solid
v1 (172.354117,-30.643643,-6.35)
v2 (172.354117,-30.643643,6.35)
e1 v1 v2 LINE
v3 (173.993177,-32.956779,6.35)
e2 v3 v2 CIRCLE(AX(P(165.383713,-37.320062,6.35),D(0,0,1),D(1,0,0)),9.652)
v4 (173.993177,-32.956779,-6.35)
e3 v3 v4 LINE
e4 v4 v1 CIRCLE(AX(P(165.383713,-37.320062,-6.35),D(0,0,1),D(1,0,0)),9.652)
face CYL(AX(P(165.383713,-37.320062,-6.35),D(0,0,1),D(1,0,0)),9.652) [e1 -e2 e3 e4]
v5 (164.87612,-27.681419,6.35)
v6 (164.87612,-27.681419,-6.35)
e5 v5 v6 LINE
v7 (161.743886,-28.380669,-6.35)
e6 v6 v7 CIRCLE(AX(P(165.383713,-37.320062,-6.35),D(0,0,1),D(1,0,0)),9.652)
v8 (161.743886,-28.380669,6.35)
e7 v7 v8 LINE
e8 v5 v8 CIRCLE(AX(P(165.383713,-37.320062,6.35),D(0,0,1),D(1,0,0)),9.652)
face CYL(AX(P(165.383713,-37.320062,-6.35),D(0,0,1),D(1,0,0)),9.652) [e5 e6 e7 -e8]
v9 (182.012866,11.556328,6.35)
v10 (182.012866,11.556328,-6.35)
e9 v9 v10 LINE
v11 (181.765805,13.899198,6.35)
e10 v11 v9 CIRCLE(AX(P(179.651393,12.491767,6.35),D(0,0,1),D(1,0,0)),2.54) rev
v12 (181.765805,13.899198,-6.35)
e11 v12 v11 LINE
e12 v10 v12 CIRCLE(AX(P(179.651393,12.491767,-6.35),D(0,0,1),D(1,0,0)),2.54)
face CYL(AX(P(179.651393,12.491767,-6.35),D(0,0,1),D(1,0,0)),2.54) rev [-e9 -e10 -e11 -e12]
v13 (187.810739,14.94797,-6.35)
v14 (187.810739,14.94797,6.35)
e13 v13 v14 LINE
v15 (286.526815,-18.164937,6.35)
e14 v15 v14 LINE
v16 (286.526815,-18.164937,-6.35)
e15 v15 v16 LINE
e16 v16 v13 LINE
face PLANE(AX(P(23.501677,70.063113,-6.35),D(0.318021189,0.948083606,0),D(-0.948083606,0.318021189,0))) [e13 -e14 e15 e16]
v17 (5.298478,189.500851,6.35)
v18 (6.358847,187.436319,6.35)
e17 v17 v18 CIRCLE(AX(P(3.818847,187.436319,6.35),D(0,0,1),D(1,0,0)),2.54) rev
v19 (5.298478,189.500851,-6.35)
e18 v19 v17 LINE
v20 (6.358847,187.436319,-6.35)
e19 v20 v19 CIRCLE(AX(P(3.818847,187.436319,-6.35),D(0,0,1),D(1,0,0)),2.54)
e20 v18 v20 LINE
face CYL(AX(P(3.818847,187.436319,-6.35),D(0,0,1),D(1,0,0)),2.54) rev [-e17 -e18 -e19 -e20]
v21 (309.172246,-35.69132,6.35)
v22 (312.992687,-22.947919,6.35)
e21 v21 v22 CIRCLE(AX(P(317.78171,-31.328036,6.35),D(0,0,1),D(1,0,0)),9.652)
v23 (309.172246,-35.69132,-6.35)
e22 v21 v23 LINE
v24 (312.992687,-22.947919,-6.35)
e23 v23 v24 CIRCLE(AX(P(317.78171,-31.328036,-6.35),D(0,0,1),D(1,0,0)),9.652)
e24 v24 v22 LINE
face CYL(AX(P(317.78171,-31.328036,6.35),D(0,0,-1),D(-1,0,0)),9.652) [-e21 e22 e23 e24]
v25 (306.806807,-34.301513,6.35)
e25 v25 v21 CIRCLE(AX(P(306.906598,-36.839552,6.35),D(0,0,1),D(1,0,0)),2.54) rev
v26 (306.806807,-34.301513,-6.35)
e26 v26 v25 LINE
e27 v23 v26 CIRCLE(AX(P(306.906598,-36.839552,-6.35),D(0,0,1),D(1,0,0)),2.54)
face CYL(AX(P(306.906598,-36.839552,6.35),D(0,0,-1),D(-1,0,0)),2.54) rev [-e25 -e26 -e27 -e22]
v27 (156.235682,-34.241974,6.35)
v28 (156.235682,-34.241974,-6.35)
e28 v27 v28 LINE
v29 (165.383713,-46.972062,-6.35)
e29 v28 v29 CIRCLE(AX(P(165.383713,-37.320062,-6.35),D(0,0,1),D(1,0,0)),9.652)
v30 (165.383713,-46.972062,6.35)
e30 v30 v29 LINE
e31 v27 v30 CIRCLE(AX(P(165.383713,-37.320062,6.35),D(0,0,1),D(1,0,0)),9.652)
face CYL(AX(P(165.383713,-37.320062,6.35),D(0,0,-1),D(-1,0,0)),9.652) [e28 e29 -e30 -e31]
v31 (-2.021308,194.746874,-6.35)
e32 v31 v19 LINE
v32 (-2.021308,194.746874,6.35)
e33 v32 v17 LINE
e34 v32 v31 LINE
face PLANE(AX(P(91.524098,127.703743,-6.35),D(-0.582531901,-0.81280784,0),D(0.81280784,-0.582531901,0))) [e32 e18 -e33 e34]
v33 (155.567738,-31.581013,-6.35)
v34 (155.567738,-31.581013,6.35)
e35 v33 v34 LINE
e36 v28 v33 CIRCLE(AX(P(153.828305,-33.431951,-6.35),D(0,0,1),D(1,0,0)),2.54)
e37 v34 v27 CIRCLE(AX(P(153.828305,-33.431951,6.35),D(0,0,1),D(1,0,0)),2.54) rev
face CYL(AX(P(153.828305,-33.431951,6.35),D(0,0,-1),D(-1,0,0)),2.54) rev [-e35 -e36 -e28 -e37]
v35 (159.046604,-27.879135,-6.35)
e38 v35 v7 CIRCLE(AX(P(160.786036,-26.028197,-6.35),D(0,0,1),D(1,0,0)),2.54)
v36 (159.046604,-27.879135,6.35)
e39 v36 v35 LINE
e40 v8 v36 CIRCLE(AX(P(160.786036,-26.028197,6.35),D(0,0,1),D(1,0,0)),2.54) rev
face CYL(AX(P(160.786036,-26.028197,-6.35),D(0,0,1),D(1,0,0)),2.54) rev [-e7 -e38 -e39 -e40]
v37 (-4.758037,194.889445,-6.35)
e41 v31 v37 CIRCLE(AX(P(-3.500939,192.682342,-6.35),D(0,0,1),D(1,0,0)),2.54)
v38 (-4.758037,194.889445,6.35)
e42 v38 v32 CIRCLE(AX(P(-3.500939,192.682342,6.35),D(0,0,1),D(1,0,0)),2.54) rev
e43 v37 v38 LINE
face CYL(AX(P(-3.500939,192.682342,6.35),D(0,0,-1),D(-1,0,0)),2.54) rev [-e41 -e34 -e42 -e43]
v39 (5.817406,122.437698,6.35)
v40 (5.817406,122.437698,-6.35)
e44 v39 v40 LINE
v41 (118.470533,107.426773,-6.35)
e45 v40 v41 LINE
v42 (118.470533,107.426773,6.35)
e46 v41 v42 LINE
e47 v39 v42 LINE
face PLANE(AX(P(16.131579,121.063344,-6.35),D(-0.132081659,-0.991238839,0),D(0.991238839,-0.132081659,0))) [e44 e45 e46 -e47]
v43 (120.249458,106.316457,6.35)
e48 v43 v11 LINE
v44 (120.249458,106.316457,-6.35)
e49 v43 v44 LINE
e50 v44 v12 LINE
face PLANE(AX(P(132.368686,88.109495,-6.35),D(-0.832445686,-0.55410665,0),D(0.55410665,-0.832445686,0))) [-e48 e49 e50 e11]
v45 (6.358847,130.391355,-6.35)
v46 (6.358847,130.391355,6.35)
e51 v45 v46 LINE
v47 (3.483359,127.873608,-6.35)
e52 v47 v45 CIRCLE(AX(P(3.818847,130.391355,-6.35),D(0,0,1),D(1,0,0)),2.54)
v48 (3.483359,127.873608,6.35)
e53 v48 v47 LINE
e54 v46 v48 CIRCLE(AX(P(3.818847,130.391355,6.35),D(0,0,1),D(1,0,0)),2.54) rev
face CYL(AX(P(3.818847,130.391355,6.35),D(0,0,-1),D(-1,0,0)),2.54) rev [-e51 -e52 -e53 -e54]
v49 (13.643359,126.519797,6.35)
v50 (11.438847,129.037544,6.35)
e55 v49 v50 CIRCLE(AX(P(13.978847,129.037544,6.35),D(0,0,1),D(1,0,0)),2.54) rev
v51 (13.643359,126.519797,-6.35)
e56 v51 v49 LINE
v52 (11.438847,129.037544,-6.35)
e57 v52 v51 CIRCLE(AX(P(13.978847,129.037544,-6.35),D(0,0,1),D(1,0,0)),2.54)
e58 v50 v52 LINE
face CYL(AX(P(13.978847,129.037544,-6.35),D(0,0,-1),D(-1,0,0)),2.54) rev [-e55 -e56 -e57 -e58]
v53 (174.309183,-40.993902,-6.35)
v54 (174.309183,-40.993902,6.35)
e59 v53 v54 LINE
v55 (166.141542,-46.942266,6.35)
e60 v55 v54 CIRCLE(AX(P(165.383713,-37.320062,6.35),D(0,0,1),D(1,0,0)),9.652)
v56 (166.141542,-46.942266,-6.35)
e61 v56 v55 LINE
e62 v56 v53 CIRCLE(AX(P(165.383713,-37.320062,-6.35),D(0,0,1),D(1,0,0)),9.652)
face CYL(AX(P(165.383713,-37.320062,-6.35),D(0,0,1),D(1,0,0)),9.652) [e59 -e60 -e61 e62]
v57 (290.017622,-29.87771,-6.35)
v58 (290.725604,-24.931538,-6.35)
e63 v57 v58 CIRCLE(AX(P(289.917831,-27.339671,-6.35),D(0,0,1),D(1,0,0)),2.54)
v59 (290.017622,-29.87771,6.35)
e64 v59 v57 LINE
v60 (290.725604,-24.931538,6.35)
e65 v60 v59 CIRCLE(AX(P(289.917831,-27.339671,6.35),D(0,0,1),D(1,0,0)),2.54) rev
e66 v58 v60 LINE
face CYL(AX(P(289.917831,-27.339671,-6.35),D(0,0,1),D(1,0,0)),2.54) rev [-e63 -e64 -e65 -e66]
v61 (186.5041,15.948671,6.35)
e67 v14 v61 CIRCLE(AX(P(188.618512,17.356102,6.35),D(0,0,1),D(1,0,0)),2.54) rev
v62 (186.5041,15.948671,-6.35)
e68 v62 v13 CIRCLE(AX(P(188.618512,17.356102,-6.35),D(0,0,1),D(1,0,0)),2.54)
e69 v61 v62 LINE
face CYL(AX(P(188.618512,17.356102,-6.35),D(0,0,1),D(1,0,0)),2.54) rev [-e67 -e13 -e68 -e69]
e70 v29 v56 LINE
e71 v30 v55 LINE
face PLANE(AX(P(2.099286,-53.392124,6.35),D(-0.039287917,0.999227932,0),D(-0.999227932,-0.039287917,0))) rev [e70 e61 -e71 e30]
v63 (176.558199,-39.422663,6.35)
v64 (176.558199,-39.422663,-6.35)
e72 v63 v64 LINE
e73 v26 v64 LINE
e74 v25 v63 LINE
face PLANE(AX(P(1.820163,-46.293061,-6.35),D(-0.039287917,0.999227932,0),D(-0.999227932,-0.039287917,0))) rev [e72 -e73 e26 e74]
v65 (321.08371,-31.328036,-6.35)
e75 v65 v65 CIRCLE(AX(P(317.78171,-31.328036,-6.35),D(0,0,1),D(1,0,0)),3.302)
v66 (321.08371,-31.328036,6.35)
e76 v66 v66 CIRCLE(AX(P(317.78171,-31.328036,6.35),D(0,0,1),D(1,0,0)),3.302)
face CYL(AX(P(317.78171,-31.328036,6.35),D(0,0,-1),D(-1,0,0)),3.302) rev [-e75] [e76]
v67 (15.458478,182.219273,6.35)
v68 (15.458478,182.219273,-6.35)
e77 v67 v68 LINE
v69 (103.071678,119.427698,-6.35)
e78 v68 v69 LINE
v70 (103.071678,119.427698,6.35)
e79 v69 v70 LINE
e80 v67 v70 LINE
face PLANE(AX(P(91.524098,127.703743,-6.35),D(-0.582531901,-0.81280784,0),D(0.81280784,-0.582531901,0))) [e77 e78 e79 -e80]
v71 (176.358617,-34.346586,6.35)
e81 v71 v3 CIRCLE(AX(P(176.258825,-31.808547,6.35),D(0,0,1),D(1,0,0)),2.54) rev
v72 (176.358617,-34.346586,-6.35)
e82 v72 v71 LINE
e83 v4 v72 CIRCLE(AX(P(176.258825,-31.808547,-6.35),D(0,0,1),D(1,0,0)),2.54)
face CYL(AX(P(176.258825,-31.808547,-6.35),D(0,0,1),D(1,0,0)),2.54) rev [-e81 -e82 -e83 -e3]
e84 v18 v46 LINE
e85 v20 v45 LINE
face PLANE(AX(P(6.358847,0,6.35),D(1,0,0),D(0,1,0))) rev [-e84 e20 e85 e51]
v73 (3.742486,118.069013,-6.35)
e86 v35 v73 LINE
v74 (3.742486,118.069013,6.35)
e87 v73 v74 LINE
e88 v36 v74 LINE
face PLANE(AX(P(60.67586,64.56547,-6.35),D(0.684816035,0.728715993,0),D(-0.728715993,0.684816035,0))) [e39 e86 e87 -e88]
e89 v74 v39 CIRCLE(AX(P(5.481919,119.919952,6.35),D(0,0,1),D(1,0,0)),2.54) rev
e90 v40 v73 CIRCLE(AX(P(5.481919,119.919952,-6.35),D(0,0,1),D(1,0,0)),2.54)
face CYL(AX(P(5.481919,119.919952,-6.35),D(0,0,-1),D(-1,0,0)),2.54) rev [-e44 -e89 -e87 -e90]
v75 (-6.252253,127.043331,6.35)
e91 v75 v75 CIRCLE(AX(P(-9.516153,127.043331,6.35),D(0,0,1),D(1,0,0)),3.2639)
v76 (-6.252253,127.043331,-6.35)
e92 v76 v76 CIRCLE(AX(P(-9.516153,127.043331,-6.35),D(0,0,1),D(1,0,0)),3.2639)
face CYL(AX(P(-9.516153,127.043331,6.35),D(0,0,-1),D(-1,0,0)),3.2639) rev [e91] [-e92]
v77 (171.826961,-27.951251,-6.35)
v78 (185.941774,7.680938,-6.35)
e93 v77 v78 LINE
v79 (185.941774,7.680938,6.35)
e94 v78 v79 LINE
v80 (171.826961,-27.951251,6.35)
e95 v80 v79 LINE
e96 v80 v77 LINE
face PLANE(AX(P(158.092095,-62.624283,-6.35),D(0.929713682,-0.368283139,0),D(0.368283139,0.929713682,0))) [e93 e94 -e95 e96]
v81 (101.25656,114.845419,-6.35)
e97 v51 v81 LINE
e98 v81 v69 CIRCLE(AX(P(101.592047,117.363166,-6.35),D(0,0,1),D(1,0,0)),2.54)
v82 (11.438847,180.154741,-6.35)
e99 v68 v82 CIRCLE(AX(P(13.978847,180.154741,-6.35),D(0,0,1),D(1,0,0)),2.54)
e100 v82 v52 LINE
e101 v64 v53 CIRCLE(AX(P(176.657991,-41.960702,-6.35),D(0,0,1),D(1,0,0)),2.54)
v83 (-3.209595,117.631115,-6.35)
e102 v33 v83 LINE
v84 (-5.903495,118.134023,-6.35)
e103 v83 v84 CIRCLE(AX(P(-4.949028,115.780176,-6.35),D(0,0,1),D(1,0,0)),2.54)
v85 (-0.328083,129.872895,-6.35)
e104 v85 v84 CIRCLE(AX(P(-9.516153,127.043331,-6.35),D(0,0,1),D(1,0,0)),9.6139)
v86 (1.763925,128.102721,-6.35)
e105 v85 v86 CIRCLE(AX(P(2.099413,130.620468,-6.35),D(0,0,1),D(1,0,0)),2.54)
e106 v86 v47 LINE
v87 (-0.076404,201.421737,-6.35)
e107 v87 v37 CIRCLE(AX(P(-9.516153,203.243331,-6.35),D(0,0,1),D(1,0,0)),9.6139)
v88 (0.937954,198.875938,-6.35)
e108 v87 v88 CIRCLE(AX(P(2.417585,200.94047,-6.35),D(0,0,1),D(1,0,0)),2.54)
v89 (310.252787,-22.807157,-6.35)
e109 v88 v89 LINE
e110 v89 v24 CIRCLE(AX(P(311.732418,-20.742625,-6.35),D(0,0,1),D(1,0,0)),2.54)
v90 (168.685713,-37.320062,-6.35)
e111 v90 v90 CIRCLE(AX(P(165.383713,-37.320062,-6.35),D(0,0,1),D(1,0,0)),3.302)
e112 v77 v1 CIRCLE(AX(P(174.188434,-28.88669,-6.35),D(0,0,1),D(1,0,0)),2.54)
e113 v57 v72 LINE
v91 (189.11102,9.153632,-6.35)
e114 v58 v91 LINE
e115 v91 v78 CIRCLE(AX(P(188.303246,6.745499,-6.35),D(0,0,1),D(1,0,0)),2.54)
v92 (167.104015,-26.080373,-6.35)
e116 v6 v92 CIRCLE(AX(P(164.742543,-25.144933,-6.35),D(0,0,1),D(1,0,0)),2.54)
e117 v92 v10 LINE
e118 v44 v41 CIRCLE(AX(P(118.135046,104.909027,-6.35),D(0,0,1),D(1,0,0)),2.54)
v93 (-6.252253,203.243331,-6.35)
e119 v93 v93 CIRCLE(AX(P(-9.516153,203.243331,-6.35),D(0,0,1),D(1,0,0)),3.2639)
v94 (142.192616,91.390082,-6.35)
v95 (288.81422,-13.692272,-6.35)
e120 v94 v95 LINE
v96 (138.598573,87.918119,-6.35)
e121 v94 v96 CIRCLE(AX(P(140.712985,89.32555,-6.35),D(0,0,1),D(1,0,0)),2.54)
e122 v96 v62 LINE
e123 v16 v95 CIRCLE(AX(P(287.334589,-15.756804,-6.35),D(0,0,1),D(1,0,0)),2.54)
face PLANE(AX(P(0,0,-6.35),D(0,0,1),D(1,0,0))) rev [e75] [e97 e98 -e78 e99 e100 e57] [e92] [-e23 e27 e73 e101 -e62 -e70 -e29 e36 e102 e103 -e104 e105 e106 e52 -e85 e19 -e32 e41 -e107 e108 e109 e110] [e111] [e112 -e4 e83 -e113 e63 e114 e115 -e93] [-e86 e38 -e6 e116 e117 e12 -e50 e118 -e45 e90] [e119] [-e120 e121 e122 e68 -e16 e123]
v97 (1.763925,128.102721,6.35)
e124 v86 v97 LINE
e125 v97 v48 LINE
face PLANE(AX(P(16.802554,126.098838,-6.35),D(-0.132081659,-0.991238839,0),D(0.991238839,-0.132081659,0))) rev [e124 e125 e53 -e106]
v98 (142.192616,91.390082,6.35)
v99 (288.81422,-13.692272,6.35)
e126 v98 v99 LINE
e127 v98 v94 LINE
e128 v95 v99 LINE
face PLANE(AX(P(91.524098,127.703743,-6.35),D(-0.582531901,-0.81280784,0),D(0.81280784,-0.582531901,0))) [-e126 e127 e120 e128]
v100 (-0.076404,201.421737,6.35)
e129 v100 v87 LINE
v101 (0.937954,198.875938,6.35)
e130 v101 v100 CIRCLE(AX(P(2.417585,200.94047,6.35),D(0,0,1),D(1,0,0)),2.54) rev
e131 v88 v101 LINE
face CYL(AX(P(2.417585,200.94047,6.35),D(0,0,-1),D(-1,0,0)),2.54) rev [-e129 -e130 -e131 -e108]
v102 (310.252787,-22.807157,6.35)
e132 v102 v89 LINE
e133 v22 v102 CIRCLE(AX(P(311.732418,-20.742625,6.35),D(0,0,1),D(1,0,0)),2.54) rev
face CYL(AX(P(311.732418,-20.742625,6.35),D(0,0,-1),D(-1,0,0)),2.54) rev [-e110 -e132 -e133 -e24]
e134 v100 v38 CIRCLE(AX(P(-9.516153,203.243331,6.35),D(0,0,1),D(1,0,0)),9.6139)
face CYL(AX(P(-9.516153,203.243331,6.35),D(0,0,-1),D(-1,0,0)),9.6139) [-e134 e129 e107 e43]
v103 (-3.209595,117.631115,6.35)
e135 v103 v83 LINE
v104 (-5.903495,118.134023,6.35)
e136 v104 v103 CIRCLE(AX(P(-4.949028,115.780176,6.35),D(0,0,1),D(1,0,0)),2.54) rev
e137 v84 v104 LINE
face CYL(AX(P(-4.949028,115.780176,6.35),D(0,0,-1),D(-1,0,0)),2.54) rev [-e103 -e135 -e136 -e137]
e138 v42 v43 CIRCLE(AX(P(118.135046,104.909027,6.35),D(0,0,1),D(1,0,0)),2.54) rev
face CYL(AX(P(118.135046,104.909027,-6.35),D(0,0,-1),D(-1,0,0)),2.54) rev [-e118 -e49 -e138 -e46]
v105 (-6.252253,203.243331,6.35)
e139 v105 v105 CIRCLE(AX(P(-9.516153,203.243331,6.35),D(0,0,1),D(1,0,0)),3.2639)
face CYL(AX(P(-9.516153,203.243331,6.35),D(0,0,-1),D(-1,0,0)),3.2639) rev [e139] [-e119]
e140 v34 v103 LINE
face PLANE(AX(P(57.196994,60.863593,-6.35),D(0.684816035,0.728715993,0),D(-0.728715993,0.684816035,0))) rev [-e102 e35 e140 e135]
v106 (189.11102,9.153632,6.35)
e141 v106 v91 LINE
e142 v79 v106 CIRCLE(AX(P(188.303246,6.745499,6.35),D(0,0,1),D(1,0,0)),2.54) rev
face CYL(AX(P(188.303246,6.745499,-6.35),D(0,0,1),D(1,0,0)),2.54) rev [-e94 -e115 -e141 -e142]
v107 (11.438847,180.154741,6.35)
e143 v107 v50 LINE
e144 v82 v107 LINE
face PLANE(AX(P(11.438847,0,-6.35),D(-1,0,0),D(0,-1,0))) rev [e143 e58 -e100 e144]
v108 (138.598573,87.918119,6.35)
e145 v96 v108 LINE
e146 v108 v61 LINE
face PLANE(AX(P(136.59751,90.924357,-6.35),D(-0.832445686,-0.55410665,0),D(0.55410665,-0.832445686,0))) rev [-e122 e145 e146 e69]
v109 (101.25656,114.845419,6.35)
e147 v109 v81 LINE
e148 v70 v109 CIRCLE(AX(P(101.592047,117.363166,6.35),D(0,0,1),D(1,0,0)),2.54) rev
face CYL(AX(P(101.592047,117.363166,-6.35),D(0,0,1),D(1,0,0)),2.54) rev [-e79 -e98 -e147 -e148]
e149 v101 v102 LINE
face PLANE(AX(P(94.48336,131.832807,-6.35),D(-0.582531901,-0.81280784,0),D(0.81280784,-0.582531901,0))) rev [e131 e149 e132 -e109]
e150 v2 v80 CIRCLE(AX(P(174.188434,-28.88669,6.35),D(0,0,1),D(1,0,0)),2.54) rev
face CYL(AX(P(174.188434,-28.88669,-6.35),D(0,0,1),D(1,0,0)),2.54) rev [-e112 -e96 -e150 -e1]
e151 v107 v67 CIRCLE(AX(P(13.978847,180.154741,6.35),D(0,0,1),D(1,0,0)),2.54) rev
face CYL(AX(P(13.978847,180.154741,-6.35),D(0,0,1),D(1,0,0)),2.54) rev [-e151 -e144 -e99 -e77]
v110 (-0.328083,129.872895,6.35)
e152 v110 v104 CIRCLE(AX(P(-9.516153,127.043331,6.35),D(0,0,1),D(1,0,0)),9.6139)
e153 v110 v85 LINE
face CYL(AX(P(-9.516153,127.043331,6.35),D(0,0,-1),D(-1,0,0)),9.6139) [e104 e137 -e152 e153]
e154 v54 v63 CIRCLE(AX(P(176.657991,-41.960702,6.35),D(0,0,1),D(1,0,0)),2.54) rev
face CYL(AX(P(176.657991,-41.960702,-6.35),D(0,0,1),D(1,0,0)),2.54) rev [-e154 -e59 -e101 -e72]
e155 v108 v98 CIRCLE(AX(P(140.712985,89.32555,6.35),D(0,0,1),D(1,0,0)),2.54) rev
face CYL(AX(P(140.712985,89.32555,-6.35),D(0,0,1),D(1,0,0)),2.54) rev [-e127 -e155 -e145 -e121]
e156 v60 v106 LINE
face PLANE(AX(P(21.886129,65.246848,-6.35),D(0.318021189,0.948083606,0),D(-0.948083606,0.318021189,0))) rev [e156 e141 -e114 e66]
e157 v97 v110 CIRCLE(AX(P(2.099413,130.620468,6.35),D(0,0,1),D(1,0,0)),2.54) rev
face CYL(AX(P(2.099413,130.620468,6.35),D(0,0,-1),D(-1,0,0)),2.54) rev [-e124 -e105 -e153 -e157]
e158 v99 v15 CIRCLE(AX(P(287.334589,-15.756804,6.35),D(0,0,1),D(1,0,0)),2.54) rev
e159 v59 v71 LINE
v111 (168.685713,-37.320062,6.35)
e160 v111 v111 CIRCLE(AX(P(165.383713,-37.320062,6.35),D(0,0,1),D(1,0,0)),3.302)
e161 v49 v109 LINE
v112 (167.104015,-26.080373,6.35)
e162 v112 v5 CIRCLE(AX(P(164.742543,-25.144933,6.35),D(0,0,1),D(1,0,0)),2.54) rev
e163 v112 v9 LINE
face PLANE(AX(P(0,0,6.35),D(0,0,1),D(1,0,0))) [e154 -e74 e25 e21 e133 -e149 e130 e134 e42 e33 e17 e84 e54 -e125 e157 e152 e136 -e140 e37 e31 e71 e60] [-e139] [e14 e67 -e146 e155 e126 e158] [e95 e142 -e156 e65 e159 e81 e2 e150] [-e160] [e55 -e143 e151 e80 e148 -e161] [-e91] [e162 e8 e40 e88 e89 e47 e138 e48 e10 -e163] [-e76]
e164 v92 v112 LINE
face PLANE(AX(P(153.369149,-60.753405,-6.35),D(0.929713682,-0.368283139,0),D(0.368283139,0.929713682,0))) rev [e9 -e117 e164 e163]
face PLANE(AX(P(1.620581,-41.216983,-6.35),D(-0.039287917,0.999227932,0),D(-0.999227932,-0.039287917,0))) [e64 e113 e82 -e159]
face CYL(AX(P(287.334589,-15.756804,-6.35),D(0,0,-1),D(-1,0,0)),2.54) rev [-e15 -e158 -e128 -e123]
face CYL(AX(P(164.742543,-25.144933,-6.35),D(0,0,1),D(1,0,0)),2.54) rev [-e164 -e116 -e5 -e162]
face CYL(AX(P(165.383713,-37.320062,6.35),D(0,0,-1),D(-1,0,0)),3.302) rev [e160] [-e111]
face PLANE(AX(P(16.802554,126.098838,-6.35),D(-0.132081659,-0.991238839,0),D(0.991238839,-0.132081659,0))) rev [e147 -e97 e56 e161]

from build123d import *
from build123d.topology import SkipClean

# Parameters (mm, degrees)
SKETCH1_R               = 3.2639
SKETCH1_R_2             = 3.302
BOSS_EXTRUDE1_DEPTH     = 6.35
FILLET1_R               = 6.35
CUT_EXTRUDE1_DEPTH      = 391.591036161
CUT_EXTRUDE1_DEPTH_BACK = 391.591036161
FILLET2_R               = 2.54
FILLET3_START           = -6.35
FILLET3_DEPTH           = 12.7


with BuildPart() as part:
    # Sketch1 → Boss-Extrude1 (new, symmetric)
    with BuildSketch(Plane.XY):
        with BuildLine():
            Line((323.403565347, -23.482283069), (-3.916489287, 211.058114043))
            ThreePointArc((-3.916489287, 211.058114043), (-17.330936491, 208.842994945), (-15.115817393, 195.42854774))
            Line((-15.115817393, 195.42854774), (6.35884666, 180.040928914))
            Line((6.35884666, 180.040928914), (6.35884666, 136.657230892))
            Line((6.35884666, 136.657230892), (-9.51615334, 136.657230892))
            ThreePointArc((-9.51615334, 136.657230892), (-18.453997349, 130.584802008), (-16.101018255, 120.038573419))
            Line((-16.101018255, 120.038573419), (158.772752683, -44.352579771))
            ThreePointArc((158.772752683, -44.352579771), (161.828207487, -46.293327152), (165.383713496, -46.97206236))
            Line((165.383713496, -46.97206236), (317.781709759, -40.9800363))
            ThreePointArc((317.781709759, -40.9800363), (326.971059958, -34.280483913), (323.403565347, -23.482283069))
        make_face()
        with Locations((-9.51615334, 203.243330892)):
            Circle(SKETCH1_R, mode=Mode.SUBTRACT)
        with Locations((317.781709759, -31.3280363)):
            Circle(SKETCH1_R_2, mode=Mode.SUBTRACT)
        with Locations((165.383713496, -37.32006236)):
            Circle(SKETCH1_R_2, mode=Mode.SUBTRACT)
        with Locations((-9.51615334, 127.043330892)):
            Circle(SKETCH1_R, mode=Mode.SUBTRACT)
    extrude(amount=BOSS_EXTRUDE1_DEPTH, both=True)

    # Fillet1
    fillet1_edges = [part.edges().sort_by_distance(p)[0] for p in [
        (6.35884666, 136.657230892, 0),
        (6.35884666, 180.040928914, 0),
    ]]
    fillet(fillet1_edges, radius=FILLET1_R)

    # Sketch3 → Cut-Extrude1 (cut, two sides: drawn at the far end of the back side and taken through both)
    with SkipClean():  # the faces are left unmerged after this step: merging them gives an invalid solid
        with BuildSketch(Plane.XY.offset(-CUT_EXTRUDE1_DEPTH_BACK)):
            with BuildLine():
                ThreePointArc((3.707435863, 181.940790938), (5.657233219, 179.680529676), (6.35884666, 176.779111181))
                Line((6.35884666, 176.779111181), (6.35884666, 188.740894591))
                Line((6.35884666, 188.740894591), (-3.45918948, 195.777390763))
                ThreePointArc((-3.45918948, 195.777390763), (-9.228570931, 193.633733108), (-15.115817393, 195.42854774))
                Line((-15.115817393, 195.42854774), (3.707435863, 181.940790938))
            make_face()
            with BuildLine():
                ThreePointArc((0.09774666, 203.243330892), (-0.052851391, 201.548341381), (-0.499927425, 199.90645459))
                Line((-0.499927425, 199.90645459), (122.05229066, 112.074407425))
                Line((122.05229066, 112.074407425), (122.945240738, 111.43443832))
                Line((122.945240738, 111.43443832), (311.692641772, -23.839087438))
                ThreePointArc((311.692641772, -23.839087438), (317.487772358, -21.680513052), (323.403565347, -23.482283069))
                Line((323.403565347, -23.482283069), (-3.916489287, 211.058114043))
                ThreePointArc((-3.916489287, 211.058114043), (-0.96449609, 207.636078493), (0.09774666, 203.243330892))
            make_face()
            Polygon((111.340098755, 113.501797091), (11.43884666, 185.10010533), (11.43884666, 126.813546556), align=None)
            with BuildLine():
                Line((119.611598008, 107.274727388), (-0.660580828, 123.300884005))
                ThreePointArc((-0.660580828, 123.300884005), (-0.831975536, 122.91875466), (-1.019850221, 122.544452529))
                Line((-1.019850221, 122.544452529), (160.337493151, -29.092258022))
                ThreePointArc((160.337493151, -29.092258022), (163.280736167, -27.8999461), (166.451617397, -27.727321081))
                Line((166.451617397, -27.727321081), (182.502514914, 12.79242434))
                Line((182.502514914, 12.79242434), (119.611598008, 107.274727388))
            make_face()
            with BuildLine():
                ThreePointArc((-4.498715678, 118.842575285), (-10.501957546, 117.480106369), (-16.101018255, 120.038573419))
                Line((-16.101018255, 120.038573419), (158.772752683, -44.352579771))
                ThreePointArc((158.772752683, -44.352579771), (155.861403554, -38.896995261), (156.858627693, -32.794135266))
                Line((156.858627693, -32.794135266), (-4.498715678, 118.842575285))
            make_face()
            Polygon((302.558149165, -23.542420343), (130.90056761, 99.482989028), (186.986074503, 15.224591797), align=None)
            with BuildLine():
                Line((174.588526659, -34.416182433), (303.849770217, -29.333853537))
                Line((303.849770217, -29.333853537), (186.828441546, 9.919290292))
                Line((186.828441546, 9.919290292), (171.174562899, -29.598199426))
                ThreePointArc((171.174562899, -29.598199426), (173.259036601, -31.739704846), (174.588526659, -34.416182433))
            make_face()
            with BuildLine():
                Line((166.141541896, -46.942265856), (317.781709759, -40.9800363))
                ThreePointArc((317.781709759, -40.9800363), (312.075009533, -39.112294551), (308.576896596, -34.231916227))
                Line((308.576896596, -34.231916227), (174.788109276, -39.492260326))
                ThreePointArc((174.788109276, -39.492260326), (171.68397902, -44.632227452), (166.141541896, -46.942265856))
            make_face()
            with BuildLine():
                Line((6.35884666, 127.490451859), (6.35884666, 143.007230892))
                ThreePointArc((6.35884666, 143.007230892), (4.498974721, 138.517102831), (0.00884666, 136.657230892))
                Line((0.00884666, 136.657230892), (-9.51615334, 136.657230892))
                ThreePointArc((-9.51615334, 136.657230892), (-3.191761895, 134.284128228), (0.010393998, 128.336377306))
                Line((0.010393998, 128.336377306), (6.35884666, 127.490451859))
            make_face()
        extrude(amount=CUT_EXTRUDE1_DEPTH + CUT_EXTRUDE1_DEPTH_BACK, mode=Mode.SUBTRACT)

    # Fillet2
    # the kernel refuses this fillet: 2.54 mm, written as the material it adds along each edge
    with BuildSketch(Plane(origin=(166.451617397, -27.727321081, -6.35), x_dir=(-0.9995758399845447, 0.029122845314151255, 0), z_dir=(0, 0, 1)), Plane(origin=(160.337493151, -29.092258022, 6.35), x_dir=(0.892287076417909, 0.4514684631927024, 0), z_dir=(0, 0, -1))) as fillet2_piece_1:
        with BuildLine():
            CenterArc((1.783556305, -2.531519164), FILLET2_R, 94.683397531, 65.375681648)
            Line((-0.604157454, -1.665249573), (-0.651911729, -1.647924181))
            Line((-0.651911729, -1.647924181), (-0.047754275, 0.017325392))
            Line((-0.047754275, 0.017325392), (0.004147805, 0.050630383))
            ThreePointArc((0.004147805, 0.050630383), (0.788083018, 0.018572822), (1.572018232, 0.050630383))
            Line((1.572018232, 0.050630383), (1.576166037, 0))
        make_face()
    extrude(amount=12.7)
    with BuildSketch(Plane(origin=(-0.660580828, 123.300884005, 6.35), x_dir=(0.9912388387460753, -0.13208165868633, 0), z_dir=(0, 0, -1))) as fillet2_piece_2:
        with BuildLine():
            CenterArc((1.591611282, 2.54), FILLET2_R, 223.323691948, 46.676308052)
            Line((-0.256211052, 0.797257155), (-0.293167498, 0.762402299))
            ThreePointArc((-0.293167498, 0.762402299), (-0.167784752, 0.385877038), (-0.048994959, -0.0134214))
            Line((-0.048994959, -0.0134214), (0, -0.0508))
            Line((0, -0.0508), (1.591611282, -0.0508))
            Line((1.591611282, -0.0508), (1.591611282, 0))
        make_face()
    extrude(amount=12.7)
    with BuildSketch(Plane(origin=(119.611598008, 107.274727388, -6.35), x_dir=(0.5541066503757912, -0.8324456859215024, 0), z_dir=(0, 0, 1))) as fillet2_piece_3:
        with BuildLine():
            CenterArc((FILLET2_R * 0.453208704568, -FILLET2_R), FILLET2_R, 90, 48.760894885)
            Line((-FILLET2_R * 0.298756464993, -FILLET2_R * 0.340797160377), (-FILLET2_R * 0.313795768384, -FILLET2_R * 0.327613103585))
            Line((-FILLET2_R * 0.313795768384, -FILLET2_R * 0.327613103585), (-FILLET2_R * 0.00906417409136, FILLET2_R * 0.02))
            Line((-FILLET2_R * 0.00906417409136, FILLET2_R * 0.02), (FILLET2_R * 0.453208704568, FILLET2_R * 0.02))
            Line((FILLET2_R * 0.453208704568, FILLET2_R * 0.02), (FILLET2_R * 0.453208704568, 0))
        make_face()
    extrude(amount=12.7)
    with BuildSketch(Plane(origin=(182.502514914, 12.79242434, -6.35), x_dir=(-0.36828313872345547, -0.9297136815880468, 0), z_dir=(0, 0, 1))) as fillet2_piece_4:
        with BuildLine():
            CenterArc((FILLET2_R * 0.523442888371, -FILLET2_R), FILLET2_R, 90, 55.258978007)
            Line((-FILLET2_R * 0.29829335557, -FILLET2_R * 0.430131993008), (-FILLET2_R * 0.314728080449, -FILLET2_R * 0.418734632868))
            Line((-FILLET2_R * 0.314728080449, -FILLET2_R * 0.418734632868), (-FILLET2_R * 0.0104688577674, FILLET2_R * 0.02))
            Line((-FILLET2_R * 0.0104688577674, FILLET2_R * 0.02), (FILLET2_R * 0.523442888371, FILLET2_R * 0.02))
            Line((FILLET2_R * 0.523442888371, FILLET2_R * 0.02), (FILLET2_R * 0.523442888371, 0))
        make_face()
    extrude(amount=12.7)
    with BuildSketch(Plane(origin=(156.858627693, -32.794135266, 6.35), x_dir=(-0.3952284110607686, -0.9185828776383654, 0), z_dir=(0, 0, -1)), Plane(origin=(308.576896596, -34.231916227, 6.35), x_dir=(0.37772010678860757, -0.925919824243764, 0), z_dir=(0, 0, -1)), Plane(origin=(174.588526659, -34.416182433, 6.35), x_dir=(-0.37772010678857665, 0.9259198242437766, 0), z_dir=(0, 0, -1))) as fillet2_piece_5:
        with BuildLine():
            CenterArc((1.783556305, 2.531519164), FILLET2_R, 199.940920821, 65.375681648)
            Line((-0.604157454, 1.665249573), (-0.651911729, 1.647924181))
            Line((-0.651911729, 1.647924181), (-0.047754275, -0.017325392))
            Line((-0.047754275, -0.017325392), (0.004147805, -0.050630383))
            ThreePointArc((0.004147805, -0.050630383), (0.788083018, -0.018572822), (1.572018232, -0.050630383))
            Line((1.572018232, -0.050630383), (1.576166037, 0))
        make_face()
    extrude(amount=12.7)
    with BuildSketch(Plane(origin=(-4.498715678, 118.842575285, 6.35), x_dir=(-0.8928548726360307, -0.45034450858214903, 0), z_dir=(0, 0, -1))) as fillet2_piece_6:
        with BuildLine():
            CenterArc((1.78119788, -2.531482193), FILLET2_R, 94.693600353, 65.293330113)
            Line((-0.605423151, -1.662206603), (-0.653155572, -1.644821091))
            Line((-0.653155572, -1.644821091), (-0.047732421, 0.017385512))
            Line((-0.047732421, 0.017385512), (0.004156821, 0.050629644))
            ThreePointArc((0.004156821, 0.050629644), (0.78667841, 0.018560101), (1.5692, 0.050629644))
            Line((1.5692, 0.050629644), (1.573356821, 0))
        make_face()
    extrude(amount=12.7)
    with BuildSketch(Plane(origin=(311.692641772, -23.839087438, 6.35), x_dir=(-0.812807839950294, 0.5825319006847067, 0), z_dir=(0, 0, -1)), Plane(origin=(174.788109276, -39.492260326, 6.35), x_dir=(0.9992279317494391, 0.03928791686687304, 0), z_dir=(0, 0, -1)), Plane(origin=(171.174562899, -29.598199426, 6.35), x_dir=(0.36828313872344726, 0.92971368158805, 0), z_dir=(0, 0, -1))) as fillet2_piece_7:
        with BuildLine():
            CenterArc((1.771457696, 2.54), FILLET2_R, 204.624318352, 65.375681648)
            Line((-0.537553035, 1.481666667), (-0.583733249, 1.4605))
            ThreePointArc((-0.583733249, 1.4605), (-0.286235802, 0.734499053), (-0.049009441, -0.013368421))
            Line((-0.049009441, -0.013368421), (0, -0.0508))
            Line((0, -0.0508), (1.771457696, -0.0508))
            Line((1.771457696, -0.0508), (1.771457696, 0))
        make_face()
    extrude(amount=12.7)
    with BuildSketch(Plane(origin=(-0.499927425, 199.90645459, 6.35), x_dir=(0.26918459485658613, 0.9630886012677626, 0), z_dir=(0, 0, -1)), Plane(origin=(0.010393998, 128.336377306, 6.35), x_dir=(-0.21513026066019494, 0.97658536285789, 0), z_dir=(0, 0, -1))) as fillet2_piece_8:
        with BuildLine():
            CenterArc((1.78119788, 2.531482193), FILLET2_R, 200.013069534, 65.293330113)
            Line((-0.605423151, 1.662206603), (-0.653155572, 1.644821091))
            Line((-0.653155572, 1.644821091), (-0.047732421, -0.017385512))
            Line((-0.047732421, -0.017385512), (0.004156821, -0.050629644))
            ThreePointArc((0.004156821, -0.050629644), (0.78667841, -0.018560101), (1.5692, -0.050629644))
            Line((1.5692, -0.050629644), (1.573356821, 0))
        make_face()
    extrude(amount=12.7)
    with BuildSketch(Plane(origin=(11.43884666, 185.10010533, -6.35), x_dir=(0, -1, 0), z_dir=(0, 0, 1))) as fillet2_piece_9:
        with BuildLine():
            CenterArc((FILLET2_R * 1.94699389315, FILLET2_R), FILLET2_R, 144.371179201, 125.628820799)
            Line((FILLET2_R * 1.1341860532, FILLET2_R * 1.58253190068), (FILLET2_R * 1.1179298964, FILLET2_R * 1.5941825387))
            Line((FILLET2_R * 1.1179298964, FILLET2_R * 1.5941825387), (-FILLET2_R * 0.016256156799, FILLET2_R * 0.0116506380137))
            Line((-FILLET2_R * 0.016256156799, FILLET2_R * 0.0116506380137), (0, -FILLET2_R * 0.02))
            Line((0, -FILLET2_R * 0.02), (FILLET2_R * 1.94699389315, -FILLET2_R * 0.02))
            Line((FILLET2_R * 1.94699389315, -FILLET2_R * 0.02), (FILLET2_R * 1.94699389315, 0))
        make_face()
    extrude(amount=12.7)
    with BuildSketch(Plane(origin=(111.340098755, 113.501797091, 6.35), x_dir=(-0.9912388387460684, 0.13208165868638097, 0), z_dir=(0, 0, -1))) as fillet2_piece_10:
        with BuildLine():
            CenterArc((FILLET2_R * 4.00498548007, FILLET2_R), FILLET2_R, 118.038920786, 151.961079214)
            Line((FILLET2_R * 3.53491424299, FILLET2_R * 1.88262847908), (FILLET2_R * 3.52551281825, FILLET2_R * 1.90028104866))
            Line((FILLET2_R * 3.52551281825, FILLET2_R * 1.90028104866), (-FILLET2_R * 0.00940142474147, FILLET2_R * 0.0176525695815))
            Line((-FILLET2_R * 0.00940142474147, FILLET2_R * 0.0176525695815), (0, -FILLET2_R * 0.02))
            Line((0, -FILLET2_R * 0.02), (FILLET2_R * 4.00498548007, -FILLET2_R * 0.02))
            Line((FILLET2_R * 4.00498548007, -FILLET2_R * 0.02), (FILLET2_R * 4.00498548007, 0))
        make_face()
    extrude(amount=12.7)
    with BuildSketch(Plane(origin=(11.43884666, 126.813546556, 6.35), x_dir=(0, 1, 0), z_dir=(0, 0, -1))) as fillet2_piece_11:
        with BuildLine():
            CenterArc((FILLET2_R * 0.875589522311, FILLET2_R), FILLET2_R, 187.589900013, 82.410099987)
            Line((-FILLET2_R * 0.115649316435, FILLET2_R * 0.867918341314), (-FILLET2_R * 0.13547409321, FILLET2_R * 0.86527670814))
            Line((-FILLET2_R * 0.13547409321, FILLET2_R * 0.86527670814), (-FILLET2_R * 0.0175117904462, -FILLET2_R * 0.02))
            Line((-FILLET2_R * 0.0175117904462, -FILLET2_R * 0.02), (FILLET2_R * 0.875589522311, -FILLET2_R * 0.02))
            Line((FILLET2_R * 0.875589522311, -FILLET2_R * 0.02), (FILLET2_R * 0.875589522311, 0))
        make_face()
    extrude(amount=12.7)
    with BuildSketch(Plane(origin=(6.35884666, 127.490451859, -6.35), x_dir=(-0.9912388387460678, 0.13208165868638616, 0), z_dir=(0, 0, 1))) as fillet2_piece_12:
        with BuildLine():
            CenterArc((FILLET2_R * 1.14208767296, -FILLET2_R), FILLET2_R, 90, 97.589900013)
            Line((FILLET2_R * 0.150848834209, -FILLET2_R * 1.13208165869), (FILLET2_R * 0.131024057434, -FILLET2_R * 1.13472329186))
            Line((FILLET2_R * 0.131024057434, -FILLET2_R * 1.13472329186), (-FILLET2_R * 0.0228417534591, FILLET2_R * 0.02))
            Line((-FILLET2_R * 0.0228417534591, FILLET2_R * 0.02), (FILLET2_R * 1.14208767296, FILLET2_R * 0.02))
            Line((FILLET2_R * 1.14208767296, FILLET2_R * 0.02), (FILLET2_R * 1.14208767296, 0))
        make_face()
    extrude(amount=12.7)
    with BuildSketch(Plane(origin=(130.90056761, 99.482989028, 6.35), x_dir=(0.8128078399502843, -0.5825319006847207, 0), z_dir=(0, 0, -1))) as fillet2_piece_13:
        with BuildLine():
            CenterArc((FILLET2_R * 5.46954418313, FILLET2_R), FILLET2_R, 110.721974099, 159.278025901)
            Line((FILLET2_R * 5.11571060351, FILLET2_R * 1.93530839723), (FILLET2_R * 5.10863393191, FILLET2_R * 1.95401456518))
            Line((FILLET2_R * 5.10863393191, FILLET2_R * 1.95401456518), (-FILLET2_R * 0.00707667159249, FILLET2_R * 0.0187061679446))
            Line((-FILLET2_R * 0.00707667159249, FILLET2_R * 0.0187061679446), (0, -FILLET2_R * 0.02))
            Line((0, -FILLET2_R * 0.02), (FILLET2_R * 5.46954418313, -FILLET2_R * 0.02))
            Line((FILLET2_R * 5.46954418313, -FILLET2_R * 0.02), (FILLET2_R * 5.46954418313, 0))
        make_face()
    extrude(amount=12.7)
    with BuildSketch(Plane(origin=(302.558149165, -23.542420343, -6.35), x_dir=(-0.8128078399502848, 0.5825319006847195, 0), z_dir=(0, 0, 1))) as fillet2_piece_14:
        with BuildLine():
            CenterArc((FILLET2_R * 6.65716498575, FILLET2_R), FILLET2_R, 107.08552386, 162.91447614)
            Line((FILLET2_R * 6.36336615702, FILLET2_R * 1.95586727543), (FILLET2_R * 6.35749018045, FILLET2_R * 1.97498462094))
            Line((FILLET2_R * 6.35749018045, FILLET2_R * 1.97498462094), (-FILLET2_R * 0.00587597657447, FILLET2_R * 0.0191173455086))
            Line((-FILLET2_R * 0.00587597657447, FILLET2_R * 0.0191173455086), (0, -FILLET2_R * 0.02))
            Line((0, -FILLET2_R * 0.02), (FILLET2_R * 6.65716498575, -FILLET2_R * 0.02))
            Line((FILLET2_R * 6.65716498575, -FILLET2_R * 0.02), (FILLET2_R * 6.65716498575, 0))
        make_face()
    extrude(amount=12.7)
    with BuildSketch(Plane(origin=(186.986074503, 15.224591797, 6.35), x_dir=(-0.5541066503758183, 0.8324456859214845, 0), z_dir=(0, 0, -1))) as fillet2_piece_15:
        with BuildLine():
            CenterArc((FILLET2_R * 0.34244962946, FILLET2_R), FILLET2_R, 232.192502041, 37.807497959)
            Line((-FILLET2_R * 0.270560821853, FILLET2_R * 0.209925201908), (-FILLET2_R * 0.282821030879, FILLET2_R * 0.194123705946))
            Line((-FILLET2_R * 0.282821030879, FILLET2_R * 0.194123705946), (-FILLET2_R * 0.00684899258921, -FILLET2_R * 0.02))
            Line((-FILLET2_R * 0.00684899258921, -FILLET2_R * 0.02), (FILLET2_R * 0.34244962946, -FILLET2_R * 0.02))
            Line((FILLET2_R * 0.34244962946, -FILLET2_R * 0.02), (FILLET2_R * 0.34244962946, 0))
        make_face()
    extrude(amount=12.7)
    with BuildSketch(Plane(origin=(186.828441546, 9.919290292, -6.35), x_dir=(0.9480836055378145, -0.31802118940475943, 0), z_dir=(0, 0, 1))) as fillet2_piece_16:
        with BuildLine():
            CenterArc((FILLET2_R * 0.947862650308, -FILLET2_R), FILLET2_R, 90, 86.933524034)
            Line((-FILLET2_R * 0.0507054908644, -FILLET2_R * 0.946505444805), (-FILLET2_R * 0.0706768536878, -FILLET2_R * 0.945435553701))
            Line((-FILLET2_R * 0.0706768536878, -FILLET2_R * 0.945435553701), (-FILLET2_R * 0.0189572530062, FILLET2_R * 0.02))
            Line((-FILLET2_R * 0.0189572530062, FILLET2_R * 0.02), (FILLET2_R * 0.947862650308, FILLET2_R * 0.02))
            Line((FILLET2_R * 0.947862650308, FILLET2_R * 0.02), (FILLET2_R * 0.947862650308, 0))
        make_face()
    extrude(amount=12.7)
    with BuildSketch(Plane(origin=(303.849770217, -29.333853537, -6.35), x_dir=(-0.9480836055378152, 0.3180211894047567, 0), z_dir=(0, 0, 1))) as fillet2_piece_17:
        with BuildLine():
            CenterArc((FILLET2_R * 5.44993537278, FILLET2_R), FILLET2_R, 110.794908257, 159.205091743)
            Line((FILLET2_R * 5.09491148757, FILLET2_R * 1.93485723024), (FILLET2_R * 5.08781100986, FILLET2_R * 1.95355437484))
            Line((FILLET2_R * 5.08781100986, FILLET2_R * 1.95355437484), (-FILLET2_R * 0.00710047770437, FILLET2_R * 0.0186971446047))
            Line((-FILLET2_R * 0.00710047770437, FILLET2_R * 0.0186971446047), (0, -FILLET2_R * 0.02))
            Line((0, -FILLET2_R * 0.02), (FILLET2_R * 5.44993537278, -FILLET2_R * 0.02))
            Line((FILLET2_R * 5.44993537278, -FILLET2_R * 0.02), (FILLET2_R * 5.44993537278, 0))
        make_face()
    extrude(amount=12.7)
    with BuildSketch(Plane(origin=(-3.45918948, 195.777390763, 6.35), x_dir=(0.8128078399502832, -0.5825319006847222, 0), z_dir=(0, 0, -1))) as fillet2_piece_18:
        with BuildLine():
            CenterArc((1.769030238, 2.54), FILLET2_R, 204.706669887, 65.293330113)
            Line((-0.53845696, 1.478349007), (-0.584606704, 1.457115987))
            ThreePointArc((-0.584606704, 1.457115987), (-0.286667821, 0.732822597), (-0.048994959, -0.0134214))
            Line((-0.048994959, -0.0134214), (0, -0.0508))
            Line((0, -0.0508), (1.769030238, -0.0508))
            Line((1.769030238, -0.0508), (1.769030238, 0))
        make_face()
    extrude(amount=12.7)
    with BuildSketch(Plane(origin=(6.35884666, 188.740894591, 6.35), x_dir=(0, -1, 0), z_dir=(0, 0, -1))) as fillet2_piece_19:
        with BuildLine():
            CenterArc((FILLET2_R * 0.51361229407, FILLET2_R), FILLET2_R, 215.628820799, 54.371179201)
            Line((-FILLET2_R * 0.29919554588, FILLET2_R * 0.417468099315), (-FILLET2_R * 0.315451702679, FILLET2_R * 0.405817461302))
            Line((-FILLET2_R * 0.315451702679, FILLET2_R * 0.405817461302), (-FILLET2_R * 0.0102722458814, -FILLET2_R * 0.02))
            Line((-FILLET2_R * 0.0102722458814, -FILLET2_R * 0.02), (FILLET2_R * 0.51361229407, -FILLET2_R * 0.02))
            Line((FILLET2_R * 0.51361229407, -FILLET2_R * 0.02), (FILLET2_R * 0.51361229407, 0))
        make_face()
    extrude(amount=12.7)

    # Fillet3: read off the stored shape, not the designer's step
    # Fillet3 outline → Fillet3 (add)
    with SkipClean():  # the faces are left unmerged after this step: merging them gives an invalid solid
        with BuildSketch(Plane.XY.offset(FILLET3_START)):
            with BuildLine():
                Line((-1.019850221, 122.544452529), (3.74248631, 118.069012918))
                ThreePointArc((3.74248631, 118.069012918), (3.18755238, 121.009667849), (5.817406452, 122.43769819))
                Line((5.817406452, 122.43769819), (0.917086091, 123.090661347))
                ThreePointArc((0.917086091, 123.090661347), (-0.107785568, 123.017572006), (-1.019850221, 122.544452529))
            make_face()
        extrude(amount=FILLET3_DEPTH)


solid = part.part
